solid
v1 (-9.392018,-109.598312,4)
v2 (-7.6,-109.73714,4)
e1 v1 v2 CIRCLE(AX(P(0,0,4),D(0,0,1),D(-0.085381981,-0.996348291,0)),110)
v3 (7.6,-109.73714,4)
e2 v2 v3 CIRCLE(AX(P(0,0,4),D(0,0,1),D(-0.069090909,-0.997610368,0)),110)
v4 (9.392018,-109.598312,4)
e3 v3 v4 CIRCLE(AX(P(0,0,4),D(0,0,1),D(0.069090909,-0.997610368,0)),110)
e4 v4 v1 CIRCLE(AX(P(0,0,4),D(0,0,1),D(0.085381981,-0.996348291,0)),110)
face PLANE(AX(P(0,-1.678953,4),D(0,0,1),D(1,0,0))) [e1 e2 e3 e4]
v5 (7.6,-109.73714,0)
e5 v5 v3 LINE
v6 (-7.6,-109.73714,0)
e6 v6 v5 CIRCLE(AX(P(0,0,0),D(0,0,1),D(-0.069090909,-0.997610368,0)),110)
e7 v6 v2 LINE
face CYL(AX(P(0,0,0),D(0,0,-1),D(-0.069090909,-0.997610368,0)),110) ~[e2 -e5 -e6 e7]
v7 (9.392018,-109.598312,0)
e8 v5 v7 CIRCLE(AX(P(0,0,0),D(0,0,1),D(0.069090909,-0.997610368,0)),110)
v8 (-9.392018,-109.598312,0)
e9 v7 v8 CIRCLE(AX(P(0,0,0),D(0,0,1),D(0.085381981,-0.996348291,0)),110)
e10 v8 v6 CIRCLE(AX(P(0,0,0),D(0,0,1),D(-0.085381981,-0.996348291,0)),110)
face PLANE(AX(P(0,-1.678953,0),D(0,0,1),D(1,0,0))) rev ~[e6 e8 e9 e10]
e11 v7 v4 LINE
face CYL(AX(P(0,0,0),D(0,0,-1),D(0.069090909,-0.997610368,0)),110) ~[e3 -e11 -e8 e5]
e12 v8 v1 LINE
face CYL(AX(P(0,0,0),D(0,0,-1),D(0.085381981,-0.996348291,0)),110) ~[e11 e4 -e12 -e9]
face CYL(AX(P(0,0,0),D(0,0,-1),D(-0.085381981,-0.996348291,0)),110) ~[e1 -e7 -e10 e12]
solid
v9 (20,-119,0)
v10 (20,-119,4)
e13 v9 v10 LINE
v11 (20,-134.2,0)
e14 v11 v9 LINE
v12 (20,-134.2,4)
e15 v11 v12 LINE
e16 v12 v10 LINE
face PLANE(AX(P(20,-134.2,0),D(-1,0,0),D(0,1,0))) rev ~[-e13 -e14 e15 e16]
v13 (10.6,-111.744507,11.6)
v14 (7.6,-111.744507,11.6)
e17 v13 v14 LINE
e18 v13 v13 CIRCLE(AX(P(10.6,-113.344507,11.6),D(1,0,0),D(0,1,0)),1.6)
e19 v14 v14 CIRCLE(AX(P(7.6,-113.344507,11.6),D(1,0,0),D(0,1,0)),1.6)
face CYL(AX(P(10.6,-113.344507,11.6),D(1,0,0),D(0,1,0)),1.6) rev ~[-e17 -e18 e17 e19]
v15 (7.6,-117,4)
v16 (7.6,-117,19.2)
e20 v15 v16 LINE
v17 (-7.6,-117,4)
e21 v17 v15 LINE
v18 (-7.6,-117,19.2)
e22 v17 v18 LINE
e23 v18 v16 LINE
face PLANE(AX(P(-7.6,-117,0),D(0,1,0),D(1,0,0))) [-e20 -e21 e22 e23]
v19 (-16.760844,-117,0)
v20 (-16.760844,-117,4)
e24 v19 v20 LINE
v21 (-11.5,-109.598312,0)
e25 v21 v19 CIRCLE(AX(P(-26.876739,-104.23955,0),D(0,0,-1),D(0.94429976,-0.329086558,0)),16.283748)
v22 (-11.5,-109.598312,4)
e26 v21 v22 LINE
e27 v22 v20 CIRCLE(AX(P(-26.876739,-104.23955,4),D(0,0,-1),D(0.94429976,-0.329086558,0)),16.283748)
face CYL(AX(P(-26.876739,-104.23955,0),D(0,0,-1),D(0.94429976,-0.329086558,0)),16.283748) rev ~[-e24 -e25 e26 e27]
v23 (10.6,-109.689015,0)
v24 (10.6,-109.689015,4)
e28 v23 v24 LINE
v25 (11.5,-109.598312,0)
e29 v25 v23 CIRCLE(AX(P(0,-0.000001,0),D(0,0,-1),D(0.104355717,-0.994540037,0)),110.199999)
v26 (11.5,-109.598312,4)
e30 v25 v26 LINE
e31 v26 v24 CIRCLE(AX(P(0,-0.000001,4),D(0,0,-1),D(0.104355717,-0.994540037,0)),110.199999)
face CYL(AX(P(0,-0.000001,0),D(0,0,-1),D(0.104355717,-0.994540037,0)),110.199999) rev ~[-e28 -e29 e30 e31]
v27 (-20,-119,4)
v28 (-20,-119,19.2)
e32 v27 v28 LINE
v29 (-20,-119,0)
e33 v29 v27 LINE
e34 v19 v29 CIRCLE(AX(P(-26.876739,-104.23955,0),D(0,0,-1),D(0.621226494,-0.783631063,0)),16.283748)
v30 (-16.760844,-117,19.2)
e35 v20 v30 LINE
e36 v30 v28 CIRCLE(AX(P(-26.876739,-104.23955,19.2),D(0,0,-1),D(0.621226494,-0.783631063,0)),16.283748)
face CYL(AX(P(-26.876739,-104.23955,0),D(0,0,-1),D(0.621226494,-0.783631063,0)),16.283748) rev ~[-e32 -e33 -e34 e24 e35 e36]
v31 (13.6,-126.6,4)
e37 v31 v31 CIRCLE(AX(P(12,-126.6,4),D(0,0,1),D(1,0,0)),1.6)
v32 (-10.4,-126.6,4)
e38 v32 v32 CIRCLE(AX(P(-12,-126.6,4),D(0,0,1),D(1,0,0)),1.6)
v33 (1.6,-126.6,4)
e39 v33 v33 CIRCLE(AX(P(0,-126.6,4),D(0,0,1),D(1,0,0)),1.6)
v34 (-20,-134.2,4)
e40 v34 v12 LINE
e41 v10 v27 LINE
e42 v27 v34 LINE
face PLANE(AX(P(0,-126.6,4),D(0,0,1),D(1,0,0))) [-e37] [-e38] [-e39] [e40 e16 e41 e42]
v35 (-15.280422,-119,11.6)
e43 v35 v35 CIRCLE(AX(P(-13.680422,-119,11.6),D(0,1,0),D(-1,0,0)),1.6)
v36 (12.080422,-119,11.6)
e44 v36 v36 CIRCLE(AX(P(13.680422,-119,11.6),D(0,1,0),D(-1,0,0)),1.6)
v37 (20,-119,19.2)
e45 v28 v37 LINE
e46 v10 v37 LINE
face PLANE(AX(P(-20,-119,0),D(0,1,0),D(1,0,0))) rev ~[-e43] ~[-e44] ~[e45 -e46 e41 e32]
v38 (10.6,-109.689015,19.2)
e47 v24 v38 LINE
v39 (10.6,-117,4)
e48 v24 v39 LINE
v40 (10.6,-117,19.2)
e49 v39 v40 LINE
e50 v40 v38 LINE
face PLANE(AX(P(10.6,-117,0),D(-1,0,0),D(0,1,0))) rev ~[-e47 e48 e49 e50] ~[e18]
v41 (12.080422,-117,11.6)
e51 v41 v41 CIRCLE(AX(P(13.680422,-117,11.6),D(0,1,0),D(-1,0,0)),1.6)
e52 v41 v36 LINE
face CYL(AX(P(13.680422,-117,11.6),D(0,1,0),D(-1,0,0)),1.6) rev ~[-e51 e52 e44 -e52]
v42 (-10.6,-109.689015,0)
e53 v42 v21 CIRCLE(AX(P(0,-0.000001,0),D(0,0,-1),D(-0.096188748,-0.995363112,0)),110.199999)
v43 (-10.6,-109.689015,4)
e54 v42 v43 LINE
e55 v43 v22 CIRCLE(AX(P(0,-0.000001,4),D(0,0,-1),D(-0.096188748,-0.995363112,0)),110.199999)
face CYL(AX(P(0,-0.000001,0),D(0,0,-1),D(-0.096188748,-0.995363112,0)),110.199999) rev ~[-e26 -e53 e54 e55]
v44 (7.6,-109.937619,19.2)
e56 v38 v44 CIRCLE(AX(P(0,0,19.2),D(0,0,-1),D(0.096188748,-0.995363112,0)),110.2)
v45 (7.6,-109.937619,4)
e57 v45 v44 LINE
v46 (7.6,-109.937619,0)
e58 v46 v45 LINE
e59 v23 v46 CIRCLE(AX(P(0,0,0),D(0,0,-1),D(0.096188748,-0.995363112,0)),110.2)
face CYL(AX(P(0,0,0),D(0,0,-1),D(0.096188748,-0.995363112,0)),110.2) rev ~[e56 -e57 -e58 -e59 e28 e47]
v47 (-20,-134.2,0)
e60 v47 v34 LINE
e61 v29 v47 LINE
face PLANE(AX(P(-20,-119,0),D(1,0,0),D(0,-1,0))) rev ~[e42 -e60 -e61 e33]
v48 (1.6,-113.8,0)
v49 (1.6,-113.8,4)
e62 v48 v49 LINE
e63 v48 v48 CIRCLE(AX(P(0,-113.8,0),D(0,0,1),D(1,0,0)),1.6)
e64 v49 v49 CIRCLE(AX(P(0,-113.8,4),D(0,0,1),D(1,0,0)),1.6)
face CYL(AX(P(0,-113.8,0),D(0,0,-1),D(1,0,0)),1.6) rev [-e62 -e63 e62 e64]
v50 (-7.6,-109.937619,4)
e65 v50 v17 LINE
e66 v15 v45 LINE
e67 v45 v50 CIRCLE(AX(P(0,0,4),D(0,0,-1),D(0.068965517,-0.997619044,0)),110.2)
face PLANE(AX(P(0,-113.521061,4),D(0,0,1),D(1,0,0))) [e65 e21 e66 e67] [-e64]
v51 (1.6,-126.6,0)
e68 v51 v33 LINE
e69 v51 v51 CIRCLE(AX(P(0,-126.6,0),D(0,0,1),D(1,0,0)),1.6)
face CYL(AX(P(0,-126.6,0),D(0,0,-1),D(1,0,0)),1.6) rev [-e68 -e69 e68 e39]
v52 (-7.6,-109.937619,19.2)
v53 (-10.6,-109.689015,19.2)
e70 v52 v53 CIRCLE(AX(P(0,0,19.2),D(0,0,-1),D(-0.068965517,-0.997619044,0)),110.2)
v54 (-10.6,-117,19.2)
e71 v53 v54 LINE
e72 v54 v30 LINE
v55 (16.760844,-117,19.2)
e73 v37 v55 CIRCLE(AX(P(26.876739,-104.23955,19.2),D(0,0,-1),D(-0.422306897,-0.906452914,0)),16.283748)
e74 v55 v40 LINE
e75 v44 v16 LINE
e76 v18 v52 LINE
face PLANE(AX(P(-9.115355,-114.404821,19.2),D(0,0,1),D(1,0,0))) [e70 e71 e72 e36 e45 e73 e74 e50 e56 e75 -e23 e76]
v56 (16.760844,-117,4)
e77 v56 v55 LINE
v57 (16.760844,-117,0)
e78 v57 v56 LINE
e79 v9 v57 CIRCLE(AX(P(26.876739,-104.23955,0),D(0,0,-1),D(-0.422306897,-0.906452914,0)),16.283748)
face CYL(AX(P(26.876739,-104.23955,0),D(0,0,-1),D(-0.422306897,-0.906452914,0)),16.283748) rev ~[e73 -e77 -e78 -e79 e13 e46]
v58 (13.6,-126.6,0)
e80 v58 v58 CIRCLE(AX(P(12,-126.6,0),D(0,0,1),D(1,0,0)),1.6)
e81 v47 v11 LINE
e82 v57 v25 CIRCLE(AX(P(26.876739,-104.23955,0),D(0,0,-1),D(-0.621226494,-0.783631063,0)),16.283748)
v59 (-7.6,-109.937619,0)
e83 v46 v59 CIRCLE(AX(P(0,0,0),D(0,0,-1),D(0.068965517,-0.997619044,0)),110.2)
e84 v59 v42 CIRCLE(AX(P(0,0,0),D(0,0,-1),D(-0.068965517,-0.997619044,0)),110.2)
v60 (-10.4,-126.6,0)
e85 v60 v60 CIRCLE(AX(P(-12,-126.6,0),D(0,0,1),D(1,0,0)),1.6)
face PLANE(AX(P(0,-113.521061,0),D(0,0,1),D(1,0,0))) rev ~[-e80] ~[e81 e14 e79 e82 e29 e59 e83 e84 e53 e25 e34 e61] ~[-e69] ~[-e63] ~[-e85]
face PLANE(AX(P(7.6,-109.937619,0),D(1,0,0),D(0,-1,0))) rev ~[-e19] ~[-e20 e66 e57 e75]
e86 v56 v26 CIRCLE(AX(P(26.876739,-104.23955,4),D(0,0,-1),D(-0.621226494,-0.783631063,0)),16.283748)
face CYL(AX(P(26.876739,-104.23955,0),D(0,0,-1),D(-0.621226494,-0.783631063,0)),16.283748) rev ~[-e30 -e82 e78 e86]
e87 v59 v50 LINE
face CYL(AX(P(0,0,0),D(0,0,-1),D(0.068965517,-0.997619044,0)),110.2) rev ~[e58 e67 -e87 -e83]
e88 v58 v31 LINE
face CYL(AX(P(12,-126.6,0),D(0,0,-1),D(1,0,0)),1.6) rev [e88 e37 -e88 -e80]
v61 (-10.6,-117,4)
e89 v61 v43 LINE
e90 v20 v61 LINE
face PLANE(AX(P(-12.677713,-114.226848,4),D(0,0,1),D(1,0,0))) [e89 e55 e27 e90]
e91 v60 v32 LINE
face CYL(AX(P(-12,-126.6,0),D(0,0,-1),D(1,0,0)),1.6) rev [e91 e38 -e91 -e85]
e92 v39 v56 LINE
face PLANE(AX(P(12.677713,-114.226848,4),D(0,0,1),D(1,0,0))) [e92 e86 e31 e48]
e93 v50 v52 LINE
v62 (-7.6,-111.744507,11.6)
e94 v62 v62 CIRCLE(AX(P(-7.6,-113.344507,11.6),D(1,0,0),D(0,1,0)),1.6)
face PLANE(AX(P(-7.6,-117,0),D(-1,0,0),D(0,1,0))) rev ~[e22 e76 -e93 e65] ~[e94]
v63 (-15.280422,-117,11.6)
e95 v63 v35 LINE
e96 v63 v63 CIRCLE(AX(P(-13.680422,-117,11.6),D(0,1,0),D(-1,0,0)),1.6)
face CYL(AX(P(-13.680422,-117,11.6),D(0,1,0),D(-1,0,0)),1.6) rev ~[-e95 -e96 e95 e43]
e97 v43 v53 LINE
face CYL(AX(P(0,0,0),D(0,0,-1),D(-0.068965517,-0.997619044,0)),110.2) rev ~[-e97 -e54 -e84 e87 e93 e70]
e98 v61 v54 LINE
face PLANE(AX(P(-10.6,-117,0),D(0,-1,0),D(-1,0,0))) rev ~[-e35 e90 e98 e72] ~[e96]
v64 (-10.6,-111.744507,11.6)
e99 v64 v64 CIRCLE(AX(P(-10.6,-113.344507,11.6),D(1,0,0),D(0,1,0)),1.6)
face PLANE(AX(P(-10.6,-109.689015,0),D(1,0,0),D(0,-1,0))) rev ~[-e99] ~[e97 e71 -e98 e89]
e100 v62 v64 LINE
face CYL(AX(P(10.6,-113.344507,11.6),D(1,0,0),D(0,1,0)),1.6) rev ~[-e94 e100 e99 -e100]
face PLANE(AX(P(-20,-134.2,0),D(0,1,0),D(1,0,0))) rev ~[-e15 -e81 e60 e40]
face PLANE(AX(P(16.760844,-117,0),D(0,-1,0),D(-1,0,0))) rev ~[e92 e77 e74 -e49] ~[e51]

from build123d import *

# Parameters (mm, degrees)
F1_R     = 1.6
F2_DEPTH = 4
F1_W     = 15.2
F1_H     = 2
F3_DEPTH = 19.2
F4_DEPTH = 4
F5_R     = 1.6
F6_DEPTH = 30.601
F7_R     = 1.6
F8_DEPTH = 17.201
F9_DEPTH = 4


# Not quite as in the source:
# - a feature names something its author has since deleted; it is built from what else it names


with BuildPart() as f2:
    # F1 (on Top) → F2 (new body)
    with BuildSketch(Plane.XY):
        Polygon((7.6, -119), (-7.6, -119), (-10.6, -119), (-20, -119), (-20, -134.2), (20, -134.2), (20, -119), (10.6, -119), align=None)
        with Locations((-12, -126.6)):
            Circle(F1_R, mode=Mode.SUBTRACT)
        with Locations((0, -126.6)):
            Circle(F1_R, mode=Mode.SUBTRACT)
        with Locations((12, -126.6)):
            Circle(F1_R, mode=Mode.SUBTRACT)
    extrude(amount=F2_DEPTH)

    # F1 (on Top) → F3 (join)
    with BuildSketch(Plane.XY):
        with BuildLine():
            Line((-7.6, -117), (-7.6, -109.9376186753))
            ThreePointArc((-7.6, -109.9376186753), (-9.1008489139, -109.8235609924), (-10.6, -109.6890149468))
            Line((-10.6, -109.6890149468), (-10.6, -117))
            Line((-10.6, -117), (-10.6, -119))
            Line((-10.6, -119), (-7.6, -119))
            Line((-7.6, -119), (-7.6, -117))
        make_face()
        with BuildLine():
            Line((-10.6, -117), (-16.7608435117, -117))
            ThreePointArc((-16.7608435117, -117), (-18.3217751354, -118.0949827906), (-20, -119))
            Line((-20, -119), (-10.6, -119))
            Line((-10.6, -119), (-10.6, -117))
        make_face()
        with Locations((0, -118)):
            Rectangle(F1_W, F1_H)
        with BuildLine():
            ThreePointArc((10.6, -109.6890149468), (9.1008489139, -109.8235609924), (7.6, -109.9376186753))
            Line((7.6, -109.9376186753), (7.6, -117))
            Line((7.6, -117), (7.6, -119))
            Line((7.6, -119), (10.6, -119))
            Line((10.6, -119), (10.6, -117))
            Line((10.6, -117), (10.6, -109.6890149468))
        make_face()
        with BuildLine():
            ThreePointArc((20, -119), (18.3217751354, -118.0949827906), (16.7608435117, -117))
            Line((16.7608435117, -117), (10.6, -117))
            Line((10.6, -117), (10.6, -119))
            Line((10.6, -119), (20, -119))
        make_face()
    extrude(amount=F3_DEPTH)

    # F1 (on Top) → F4 (join)
    with BuildSketch(Plane.XY):
        with BuildLine():
            ThreePointArc((7.6, -109.9376186753), (0, -110.2), (-7.6, -109.9376186753))
            Line((-7.6, -109.9376186753), (-7.6, -117))
            Line((-7.6, -117), (7.6, -117))
            Line((7.6, -117), (7.6, -109.9376186753))
        make_face()
        with Locations((0, -113.8)):
            Circle(F1_R, mode=Mode.SUBTRACT)
        with BuildLine():
            ThreePointArc((16.7608435117, -117), (13.6040282901, -113.6732968412), (11.5, -109.5983120308))
            ThreePointArc((11.5, -109.5983120308), (11.0500930654, -109.6445869309), (10.6, -109.6890149468))
            Line((10.6, -109.6890149468), (10.6, -117))
            Line((10.6, -117), (16.7608435117, -117))
        make_face()
        with BuildLine():
            ThreePointArc((-10.6, -109.6890149468), (-11.0500930654, -109.6445869309), (-11.5, -109.5983120308))
            ThreePointArc((-11.5, -109.5983120308), (-13.6040282901, -113.6732968412), (-16.7608435117, -117))
            Line((-16.7608435117, -117), (-10.6, -117))
            Line((-10.6, -117), (-10.6, -109.6890149468))
        make_face()
    extrude(amount=F4_DEPTH)

    # F5 (on face) → F6 (cut, through all)
    with BuildSketch(Plane.YZ.offset(10.6)):
        with Locations((-113.3445074734, 11.6)):
            Circle(F5_R)
    extrude(amount=-F6_DEPTH, mode=Mode.SUBTRACT)

    # F7 (on face) → F8 (cut, through all)
    with BuildSketch(Plane(origin=(0, -117, 0), x_dir=(-1, 0, 0), z_dir=(0, 1, 0))):
        with Locations((-13.6804217559, 11.6)):
            Circle(F7_R)
        with Locations((13.6804217559, 11.6)):
            Circle(F7_R)
    extrude(amount=-F8_DEPTH, mode=Mode.SUBTRACT)


with BuildPart() as f9:
    # F1 (on Top) → F9 (new body)
    with BuildSketch(Plane.XY):
        with BuildLine():
            ThreePointArc((9.3920178876, -109.5983120308), (81.0343197899, -74.3870890423), (110, 0))
            ThreePointArc((110, 0), (-74.3870890423, 81.0343197899), (-9.3920178876, -109.5983120308))
            Line((-9.3920178876, -109.5983120308), (-7.6, -109.5983120308))
            Line((-7.6, -109.5983120308), (7.6, -109.5983120308))
            Line((7.6, -109.5983120308), (9.3920178876, -109.5983120308))
        make_face()
        with BuildLine():
            Line((-7.6, -109.5983120308), (-7.6, -109.7371404767))
            ThreePointArc((-7.6, -109.7371404767), (0, -110), (7.6, -109.7371404767))
            Line((7.6, -109.7371404767), (7.6, -109.5983120308))
            Line((7.6, -109.5983120308), (-7.6, -109.5983120308))
        make_face()
        with BuildLine():
            Line((-7.6, -109.5983120308), (-9.3920178876, -109.5983120308))
            ThreePointArc((-9.3920178876, -109.5983120308), (-8.4962925036, -109.6713864857), (-7.6, -109.7371404767))
            Line((-7.6, -109.7371404767), (-7.6, -109.5983120308))
        make_face()
        with BuildLine():
            ThreePointArc((7.6, -109.7371404767), (8.4962925036, -109.6713864857), (9.3920178876, -109.5983120308))
            Line((9.3920178876, -109.5983120308), (7.6, -109.5983120308))
            Line((7.6, -109.5983120308), (7.6, -109.7371404767))
        make_face()
    extrude(amount=F9_DEPTH)


solid = Compound([f2.part, f9.part])
